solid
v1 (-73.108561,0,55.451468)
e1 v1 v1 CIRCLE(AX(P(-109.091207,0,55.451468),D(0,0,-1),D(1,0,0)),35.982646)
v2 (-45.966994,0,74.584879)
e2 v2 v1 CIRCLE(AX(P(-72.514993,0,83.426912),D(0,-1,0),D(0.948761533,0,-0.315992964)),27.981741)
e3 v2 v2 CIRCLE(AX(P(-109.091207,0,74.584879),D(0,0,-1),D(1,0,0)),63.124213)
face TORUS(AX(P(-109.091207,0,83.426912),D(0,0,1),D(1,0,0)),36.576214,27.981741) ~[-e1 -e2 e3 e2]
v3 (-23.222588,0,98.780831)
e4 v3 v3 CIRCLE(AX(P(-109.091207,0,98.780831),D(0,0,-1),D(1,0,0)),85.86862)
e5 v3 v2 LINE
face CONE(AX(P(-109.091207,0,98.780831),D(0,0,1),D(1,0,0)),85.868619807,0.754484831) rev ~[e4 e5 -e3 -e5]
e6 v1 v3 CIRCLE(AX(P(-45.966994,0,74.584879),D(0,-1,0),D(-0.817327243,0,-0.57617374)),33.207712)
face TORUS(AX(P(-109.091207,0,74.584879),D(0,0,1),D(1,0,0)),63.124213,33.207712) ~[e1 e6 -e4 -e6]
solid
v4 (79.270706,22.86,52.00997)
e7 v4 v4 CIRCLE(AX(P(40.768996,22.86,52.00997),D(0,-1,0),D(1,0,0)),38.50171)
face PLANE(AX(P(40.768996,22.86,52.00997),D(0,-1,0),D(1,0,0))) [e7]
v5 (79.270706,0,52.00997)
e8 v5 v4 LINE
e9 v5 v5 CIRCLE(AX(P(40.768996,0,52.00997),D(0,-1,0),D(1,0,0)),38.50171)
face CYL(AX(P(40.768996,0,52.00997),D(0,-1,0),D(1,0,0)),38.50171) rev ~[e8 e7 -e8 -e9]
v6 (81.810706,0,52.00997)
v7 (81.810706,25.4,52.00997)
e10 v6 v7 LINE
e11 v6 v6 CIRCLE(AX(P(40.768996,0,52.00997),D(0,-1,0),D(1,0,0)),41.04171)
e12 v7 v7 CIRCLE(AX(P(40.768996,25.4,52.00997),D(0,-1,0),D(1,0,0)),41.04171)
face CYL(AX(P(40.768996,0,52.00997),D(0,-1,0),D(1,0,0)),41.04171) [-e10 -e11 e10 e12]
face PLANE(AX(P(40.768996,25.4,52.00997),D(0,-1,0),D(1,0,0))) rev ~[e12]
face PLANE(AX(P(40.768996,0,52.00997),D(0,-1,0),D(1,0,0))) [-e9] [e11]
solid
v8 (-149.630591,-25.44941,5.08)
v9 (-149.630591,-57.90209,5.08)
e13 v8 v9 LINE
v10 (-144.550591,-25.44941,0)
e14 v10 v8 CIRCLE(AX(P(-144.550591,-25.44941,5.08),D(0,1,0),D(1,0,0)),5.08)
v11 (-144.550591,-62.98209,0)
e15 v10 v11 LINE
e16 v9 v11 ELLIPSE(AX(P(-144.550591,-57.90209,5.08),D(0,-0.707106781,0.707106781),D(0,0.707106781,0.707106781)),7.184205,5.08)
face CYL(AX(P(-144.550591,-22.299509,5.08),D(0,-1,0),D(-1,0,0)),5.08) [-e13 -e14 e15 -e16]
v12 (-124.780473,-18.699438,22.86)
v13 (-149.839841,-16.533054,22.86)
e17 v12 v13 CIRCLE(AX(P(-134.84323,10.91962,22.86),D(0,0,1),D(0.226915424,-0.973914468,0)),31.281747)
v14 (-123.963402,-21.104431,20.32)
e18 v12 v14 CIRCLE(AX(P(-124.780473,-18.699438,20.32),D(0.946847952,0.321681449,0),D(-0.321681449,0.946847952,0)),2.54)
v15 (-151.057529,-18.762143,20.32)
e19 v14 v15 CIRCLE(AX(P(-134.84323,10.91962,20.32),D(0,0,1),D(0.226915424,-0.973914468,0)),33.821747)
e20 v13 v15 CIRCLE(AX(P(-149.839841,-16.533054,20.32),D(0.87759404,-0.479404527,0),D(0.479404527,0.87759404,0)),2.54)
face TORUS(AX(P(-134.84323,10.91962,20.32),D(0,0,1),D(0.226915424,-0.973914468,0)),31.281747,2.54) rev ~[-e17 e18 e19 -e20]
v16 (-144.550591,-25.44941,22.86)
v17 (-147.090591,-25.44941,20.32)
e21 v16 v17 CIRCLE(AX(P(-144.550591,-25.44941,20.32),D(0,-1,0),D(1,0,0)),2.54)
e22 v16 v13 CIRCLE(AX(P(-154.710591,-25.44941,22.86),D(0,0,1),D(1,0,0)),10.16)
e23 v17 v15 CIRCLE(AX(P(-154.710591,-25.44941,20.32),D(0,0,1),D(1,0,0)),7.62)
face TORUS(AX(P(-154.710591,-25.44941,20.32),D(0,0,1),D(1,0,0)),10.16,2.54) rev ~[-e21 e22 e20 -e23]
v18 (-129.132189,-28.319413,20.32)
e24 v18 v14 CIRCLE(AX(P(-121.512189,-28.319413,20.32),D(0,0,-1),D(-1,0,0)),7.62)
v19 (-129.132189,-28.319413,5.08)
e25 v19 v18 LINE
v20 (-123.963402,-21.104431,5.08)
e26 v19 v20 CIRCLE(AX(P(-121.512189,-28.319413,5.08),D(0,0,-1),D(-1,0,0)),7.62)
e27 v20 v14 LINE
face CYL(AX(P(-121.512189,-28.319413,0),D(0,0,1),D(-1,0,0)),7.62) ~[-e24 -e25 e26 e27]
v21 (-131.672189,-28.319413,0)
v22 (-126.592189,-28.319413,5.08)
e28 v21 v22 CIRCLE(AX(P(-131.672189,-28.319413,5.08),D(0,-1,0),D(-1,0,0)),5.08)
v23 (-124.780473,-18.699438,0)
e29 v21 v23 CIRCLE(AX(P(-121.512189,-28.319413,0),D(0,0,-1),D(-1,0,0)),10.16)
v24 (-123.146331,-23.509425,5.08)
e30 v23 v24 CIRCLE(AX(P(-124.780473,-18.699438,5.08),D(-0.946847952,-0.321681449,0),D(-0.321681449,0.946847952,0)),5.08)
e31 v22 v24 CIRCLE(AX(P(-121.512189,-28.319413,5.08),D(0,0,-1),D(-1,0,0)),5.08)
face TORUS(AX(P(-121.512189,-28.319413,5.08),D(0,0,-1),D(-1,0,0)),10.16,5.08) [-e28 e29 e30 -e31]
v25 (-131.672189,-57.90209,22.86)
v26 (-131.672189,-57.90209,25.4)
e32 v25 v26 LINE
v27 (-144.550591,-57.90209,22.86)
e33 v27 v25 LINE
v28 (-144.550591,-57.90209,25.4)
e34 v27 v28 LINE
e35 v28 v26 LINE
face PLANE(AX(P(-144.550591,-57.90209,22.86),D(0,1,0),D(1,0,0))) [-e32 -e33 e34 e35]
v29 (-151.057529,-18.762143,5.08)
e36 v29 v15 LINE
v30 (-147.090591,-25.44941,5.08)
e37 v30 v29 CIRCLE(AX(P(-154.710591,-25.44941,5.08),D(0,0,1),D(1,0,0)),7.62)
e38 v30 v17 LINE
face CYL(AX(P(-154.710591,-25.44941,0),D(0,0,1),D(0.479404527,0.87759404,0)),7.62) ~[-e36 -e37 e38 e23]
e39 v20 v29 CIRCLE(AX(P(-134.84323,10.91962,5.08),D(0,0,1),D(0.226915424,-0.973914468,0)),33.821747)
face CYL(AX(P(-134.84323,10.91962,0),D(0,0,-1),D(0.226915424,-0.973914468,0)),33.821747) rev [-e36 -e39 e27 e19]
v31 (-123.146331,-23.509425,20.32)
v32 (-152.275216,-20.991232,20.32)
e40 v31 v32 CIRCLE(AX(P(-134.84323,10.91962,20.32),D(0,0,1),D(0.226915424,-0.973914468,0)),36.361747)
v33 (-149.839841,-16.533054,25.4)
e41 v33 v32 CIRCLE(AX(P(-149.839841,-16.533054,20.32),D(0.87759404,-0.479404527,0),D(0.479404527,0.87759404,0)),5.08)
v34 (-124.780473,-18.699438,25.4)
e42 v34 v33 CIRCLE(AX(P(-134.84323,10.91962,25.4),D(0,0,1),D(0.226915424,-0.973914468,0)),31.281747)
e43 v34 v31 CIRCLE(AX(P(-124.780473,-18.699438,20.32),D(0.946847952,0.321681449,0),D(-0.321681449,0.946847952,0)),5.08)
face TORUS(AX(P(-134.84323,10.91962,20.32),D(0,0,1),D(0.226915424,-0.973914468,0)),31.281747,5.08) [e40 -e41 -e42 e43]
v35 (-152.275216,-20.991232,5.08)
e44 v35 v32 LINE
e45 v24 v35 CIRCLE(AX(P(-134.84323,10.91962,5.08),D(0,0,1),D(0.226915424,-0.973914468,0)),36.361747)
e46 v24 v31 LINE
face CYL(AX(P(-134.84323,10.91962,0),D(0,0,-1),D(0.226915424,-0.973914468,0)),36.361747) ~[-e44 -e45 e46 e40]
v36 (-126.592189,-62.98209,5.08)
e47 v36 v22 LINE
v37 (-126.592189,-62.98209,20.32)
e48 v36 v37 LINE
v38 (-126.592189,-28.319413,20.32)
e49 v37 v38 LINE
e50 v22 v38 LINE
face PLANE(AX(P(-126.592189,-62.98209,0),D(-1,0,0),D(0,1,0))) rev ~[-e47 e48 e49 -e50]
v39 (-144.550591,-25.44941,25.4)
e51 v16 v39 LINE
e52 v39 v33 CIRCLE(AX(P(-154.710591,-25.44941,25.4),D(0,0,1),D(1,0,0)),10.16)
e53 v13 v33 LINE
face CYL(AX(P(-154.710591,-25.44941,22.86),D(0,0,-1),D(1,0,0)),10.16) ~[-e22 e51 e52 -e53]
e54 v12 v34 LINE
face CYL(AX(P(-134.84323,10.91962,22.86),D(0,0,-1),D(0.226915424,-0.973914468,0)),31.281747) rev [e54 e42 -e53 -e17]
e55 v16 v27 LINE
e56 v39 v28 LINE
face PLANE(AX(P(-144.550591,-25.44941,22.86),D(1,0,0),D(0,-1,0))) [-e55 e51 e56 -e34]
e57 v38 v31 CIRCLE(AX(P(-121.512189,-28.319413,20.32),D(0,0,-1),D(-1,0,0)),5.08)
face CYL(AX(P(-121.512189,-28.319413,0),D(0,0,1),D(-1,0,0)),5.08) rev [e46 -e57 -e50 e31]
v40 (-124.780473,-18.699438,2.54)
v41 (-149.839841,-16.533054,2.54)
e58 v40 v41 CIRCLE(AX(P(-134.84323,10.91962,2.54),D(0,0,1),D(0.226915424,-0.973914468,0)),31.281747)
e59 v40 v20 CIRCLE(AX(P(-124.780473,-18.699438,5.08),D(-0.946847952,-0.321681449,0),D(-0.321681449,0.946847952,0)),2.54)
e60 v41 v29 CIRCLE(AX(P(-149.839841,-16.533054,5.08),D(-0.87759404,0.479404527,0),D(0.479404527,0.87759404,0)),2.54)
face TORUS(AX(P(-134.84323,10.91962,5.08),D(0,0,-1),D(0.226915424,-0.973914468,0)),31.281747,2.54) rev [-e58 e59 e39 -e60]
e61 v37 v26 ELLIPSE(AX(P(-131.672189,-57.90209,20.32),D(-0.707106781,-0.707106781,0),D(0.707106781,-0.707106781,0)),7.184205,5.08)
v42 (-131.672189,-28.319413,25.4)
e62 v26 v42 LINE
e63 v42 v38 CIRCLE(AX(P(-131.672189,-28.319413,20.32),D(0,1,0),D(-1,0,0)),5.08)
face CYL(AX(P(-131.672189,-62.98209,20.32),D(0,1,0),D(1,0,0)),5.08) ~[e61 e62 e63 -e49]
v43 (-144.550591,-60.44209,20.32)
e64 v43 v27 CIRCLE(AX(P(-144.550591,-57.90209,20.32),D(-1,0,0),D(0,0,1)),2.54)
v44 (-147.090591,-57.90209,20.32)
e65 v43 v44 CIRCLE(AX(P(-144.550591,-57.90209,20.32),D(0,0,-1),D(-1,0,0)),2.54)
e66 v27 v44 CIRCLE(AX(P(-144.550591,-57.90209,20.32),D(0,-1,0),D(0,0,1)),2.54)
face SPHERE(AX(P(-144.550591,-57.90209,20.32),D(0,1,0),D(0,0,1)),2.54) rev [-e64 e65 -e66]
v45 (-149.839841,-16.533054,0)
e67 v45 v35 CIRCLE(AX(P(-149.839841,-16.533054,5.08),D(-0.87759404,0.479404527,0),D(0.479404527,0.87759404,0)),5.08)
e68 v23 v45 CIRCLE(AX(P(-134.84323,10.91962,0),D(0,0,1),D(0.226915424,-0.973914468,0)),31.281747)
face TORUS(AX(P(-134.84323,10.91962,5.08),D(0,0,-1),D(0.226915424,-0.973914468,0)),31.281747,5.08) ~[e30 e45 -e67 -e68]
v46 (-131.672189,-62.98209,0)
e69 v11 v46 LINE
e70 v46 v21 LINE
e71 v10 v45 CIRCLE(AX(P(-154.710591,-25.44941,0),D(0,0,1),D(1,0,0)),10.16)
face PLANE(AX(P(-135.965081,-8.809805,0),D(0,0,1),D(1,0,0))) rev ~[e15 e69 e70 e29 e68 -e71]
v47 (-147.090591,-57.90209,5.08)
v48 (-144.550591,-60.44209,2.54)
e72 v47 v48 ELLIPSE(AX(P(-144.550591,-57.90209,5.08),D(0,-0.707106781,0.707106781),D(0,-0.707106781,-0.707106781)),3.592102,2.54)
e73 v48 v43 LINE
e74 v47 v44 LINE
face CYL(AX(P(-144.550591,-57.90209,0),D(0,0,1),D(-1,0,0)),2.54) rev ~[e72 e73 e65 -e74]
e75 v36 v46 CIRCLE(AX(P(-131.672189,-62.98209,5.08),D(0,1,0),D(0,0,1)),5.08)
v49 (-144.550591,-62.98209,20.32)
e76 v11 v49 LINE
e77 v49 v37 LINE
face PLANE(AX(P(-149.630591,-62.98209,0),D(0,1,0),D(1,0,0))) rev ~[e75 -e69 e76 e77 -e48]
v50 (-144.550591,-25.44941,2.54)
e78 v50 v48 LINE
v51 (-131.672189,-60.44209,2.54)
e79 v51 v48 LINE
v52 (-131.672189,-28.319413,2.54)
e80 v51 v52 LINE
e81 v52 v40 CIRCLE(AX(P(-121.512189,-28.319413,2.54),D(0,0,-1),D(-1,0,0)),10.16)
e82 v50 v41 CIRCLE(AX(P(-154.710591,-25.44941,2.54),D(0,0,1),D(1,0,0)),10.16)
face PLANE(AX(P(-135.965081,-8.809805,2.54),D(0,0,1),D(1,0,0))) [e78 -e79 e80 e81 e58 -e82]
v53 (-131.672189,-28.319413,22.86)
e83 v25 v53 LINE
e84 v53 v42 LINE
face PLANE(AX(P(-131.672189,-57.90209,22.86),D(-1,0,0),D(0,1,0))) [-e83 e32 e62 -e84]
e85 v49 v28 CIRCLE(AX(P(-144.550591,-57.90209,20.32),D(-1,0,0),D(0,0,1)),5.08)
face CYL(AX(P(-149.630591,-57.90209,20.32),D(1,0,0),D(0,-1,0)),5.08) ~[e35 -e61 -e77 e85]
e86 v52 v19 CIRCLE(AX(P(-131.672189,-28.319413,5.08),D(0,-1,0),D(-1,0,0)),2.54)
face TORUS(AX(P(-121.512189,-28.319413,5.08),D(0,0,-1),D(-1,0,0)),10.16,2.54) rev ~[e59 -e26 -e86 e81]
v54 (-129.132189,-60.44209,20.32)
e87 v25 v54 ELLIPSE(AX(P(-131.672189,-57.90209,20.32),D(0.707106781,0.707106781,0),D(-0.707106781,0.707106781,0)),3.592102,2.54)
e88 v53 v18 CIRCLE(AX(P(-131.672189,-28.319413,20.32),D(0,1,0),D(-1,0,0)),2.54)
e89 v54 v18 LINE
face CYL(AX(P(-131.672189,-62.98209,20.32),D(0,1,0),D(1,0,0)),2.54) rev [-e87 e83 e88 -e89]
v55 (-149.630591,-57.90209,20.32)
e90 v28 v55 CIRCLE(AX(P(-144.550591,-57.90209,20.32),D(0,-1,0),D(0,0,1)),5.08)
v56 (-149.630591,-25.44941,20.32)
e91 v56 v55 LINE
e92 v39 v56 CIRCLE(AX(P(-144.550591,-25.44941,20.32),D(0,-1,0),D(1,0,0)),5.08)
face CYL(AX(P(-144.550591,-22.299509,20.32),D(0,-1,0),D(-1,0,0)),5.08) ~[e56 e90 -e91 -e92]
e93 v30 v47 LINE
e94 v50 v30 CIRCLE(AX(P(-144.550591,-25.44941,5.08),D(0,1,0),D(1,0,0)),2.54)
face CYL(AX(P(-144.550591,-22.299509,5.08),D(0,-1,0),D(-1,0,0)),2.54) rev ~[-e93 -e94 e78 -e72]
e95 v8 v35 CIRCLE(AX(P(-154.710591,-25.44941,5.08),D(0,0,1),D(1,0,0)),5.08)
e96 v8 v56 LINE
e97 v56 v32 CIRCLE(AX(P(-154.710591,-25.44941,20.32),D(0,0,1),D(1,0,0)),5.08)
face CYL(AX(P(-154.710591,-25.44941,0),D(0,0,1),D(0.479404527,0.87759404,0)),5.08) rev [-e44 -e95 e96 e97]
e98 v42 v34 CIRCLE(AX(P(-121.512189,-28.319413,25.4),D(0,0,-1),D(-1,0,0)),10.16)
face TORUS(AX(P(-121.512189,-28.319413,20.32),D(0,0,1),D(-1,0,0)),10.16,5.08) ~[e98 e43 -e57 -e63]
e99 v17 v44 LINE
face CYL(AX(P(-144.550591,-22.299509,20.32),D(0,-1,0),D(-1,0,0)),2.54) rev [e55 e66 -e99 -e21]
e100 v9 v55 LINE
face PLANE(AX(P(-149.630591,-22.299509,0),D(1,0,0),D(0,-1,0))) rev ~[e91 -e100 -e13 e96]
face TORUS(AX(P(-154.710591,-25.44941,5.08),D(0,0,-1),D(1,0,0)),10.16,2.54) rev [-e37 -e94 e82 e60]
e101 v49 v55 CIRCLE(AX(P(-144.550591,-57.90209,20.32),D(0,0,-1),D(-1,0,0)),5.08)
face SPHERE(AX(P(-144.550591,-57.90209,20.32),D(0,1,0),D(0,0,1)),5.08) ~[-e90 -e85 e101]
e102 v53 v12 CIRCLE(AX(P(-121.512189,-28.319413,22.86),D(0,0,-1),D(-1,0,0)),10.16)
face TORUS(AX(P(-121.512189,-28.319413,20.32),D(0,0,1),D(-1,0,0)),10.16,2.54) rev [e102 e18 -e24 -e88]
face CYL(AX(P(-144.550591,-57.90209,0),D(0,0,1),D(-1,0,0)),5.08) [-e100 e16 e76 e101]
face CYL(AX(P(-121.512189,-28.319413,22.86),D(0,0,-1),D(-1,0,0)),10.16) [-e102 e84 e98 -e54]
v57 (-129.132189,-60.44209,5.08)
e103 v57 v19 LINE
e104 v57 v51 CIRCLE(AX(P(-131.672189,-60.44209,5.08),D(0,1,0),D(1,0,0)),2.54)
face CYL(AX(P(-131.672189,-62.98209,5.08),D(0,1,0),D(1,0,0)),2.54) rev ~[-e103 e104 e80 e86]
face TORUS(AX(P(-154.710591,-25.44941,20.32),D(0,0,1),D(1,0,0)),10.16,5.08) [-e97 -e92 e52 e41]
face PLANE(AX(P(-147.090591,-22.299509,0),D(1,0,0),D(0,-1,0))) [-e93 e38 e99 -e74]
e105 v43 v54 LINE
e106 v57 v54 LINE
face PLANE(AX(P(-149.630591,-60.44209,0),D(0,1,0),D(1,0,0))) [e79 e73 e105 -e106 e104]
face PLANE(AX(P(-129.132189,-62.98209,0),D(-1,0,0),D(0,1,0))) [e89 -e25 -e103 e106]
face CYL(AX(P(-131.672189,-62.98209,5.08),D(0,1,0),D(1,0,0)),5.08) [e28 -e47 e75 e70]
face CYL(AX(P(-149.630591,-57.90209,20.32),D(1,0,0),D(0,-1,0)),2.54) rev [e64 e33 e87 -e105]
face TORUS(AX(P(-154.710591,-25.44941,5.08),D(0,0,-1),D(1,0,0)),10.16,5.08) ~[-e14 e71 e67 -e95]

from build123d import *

# Parameters (mm, degrees)
F1_DEPTH = 25.4
F2_R     = 41.0417101423
F3_DEPTH = 25.4
F6_T     = -2.54
F7_R     = 5.08
F8_T     = -2.54


# Not quite as in the source:
# - a shell that OpenCascade refuses in one call is made with other operations: the cavity is built on its own and cut out


with BuildPart() as f1:
    # F0 (on Top) → F1 (new body)
    with BuildSketch(Plane.XY):
        with BuildLine():
            Line((-126.5921890736, -62.9820898175), (-126.5921890736, -24.4936109867))
            ThreePointArc((-126.5921890736, -24.4936109867), (-131.3958559367, 47.1175793383), (-149.6305912733, -22.2995094965))
            Line((-149.6305912733, -22.2995094965), (-149.6305912733, -62.9820898175))
            Line((-149.6305912733, -62.9820898175), (-126.5921890736, -62.9820898175))
        make_face()
    extrude(amount=F1_DEPTH)

    # F7
    f7_edges = [f1.edges().sort_by_distance(p)[0] for p in [
        (-149.630591, -42.6408, 25.4),
        (-138.11139, -62.98209, 25.4),
        (-126.592189, -43.73785, 25.4),
        (-131.395856, 47.117579, 25.4),
        (-131.395856, 47.117579, 0),
        (-126.592189, -24.493611, 12.7),
        (-149.630591, -62.98209, 12.7),
        (-149.630591, -22.299509, 12.7),
        (-149.630591, -42.6408, 0),
        (-126.592189, -43.73785, 0),
    ]]
    fillet(f7_edges, radius=F7_R)

    # F8: a shell. OpenCascade refuses it in one call, so the cavity is built on its own and cut out:
    # the body offset inwards by the wall thickness, plus a prism from it out through each open face.
    f8_core = offset(f1.part, amount=F8_T, mode=Mode.PRIVATE)
    f8_exits = [f8_core.faces().sort_by_distance(p)[0] for p in [
        (-135.30035, 3.951627, 22.86),
    ]]
    add(f8_core, mode=Mode.SUBTRACT)
    extrude(f8_exits, amount=-F8_T, mode=Mode.SUBTRACT)


with BuildPart() as f3:
    # F2 (on Front) → F3 (new body)
    with BuildSketch(Plane.XZ):
        with Locations((40.7689958811, 52.0099699497)):
            Circle(F2_R)
    extrude(amount=-F3_DEPTH)

    # F6
    f6_openings = [f3.faces().sort_by_distance(p)[0] for p in [
        (40.768996, 0, 52.00997),
    ]]
    offset(amount=F6_T, openings=f6_openings)


with BuildPart() as f5:
    # F4 (on Front) → F5 (revolve)
    with BuildSketch(Plane.XZ):
        with BuildLine():
            ThreePointArc((-45.9669940174, 74.5848789811), (-88.6373376907, 106.2971513586), (-73.108561337, 55.4514676332))
            ThreePointArc((-73.108561337, 55.4514676332), (-24.1910397784, 49.5137816107), (-23.2225875779, 98.7808307518))
            Line((-23.2225875779, 98.7808307518), (-45.9669940174, 74.5848789811))
        make_face()
    revolve(axis=Axis((-109.0912073851, 0, 83.1956714392), (0, 0, -1)))


solid = Compound([f1.part, f3.part, f5.part])
